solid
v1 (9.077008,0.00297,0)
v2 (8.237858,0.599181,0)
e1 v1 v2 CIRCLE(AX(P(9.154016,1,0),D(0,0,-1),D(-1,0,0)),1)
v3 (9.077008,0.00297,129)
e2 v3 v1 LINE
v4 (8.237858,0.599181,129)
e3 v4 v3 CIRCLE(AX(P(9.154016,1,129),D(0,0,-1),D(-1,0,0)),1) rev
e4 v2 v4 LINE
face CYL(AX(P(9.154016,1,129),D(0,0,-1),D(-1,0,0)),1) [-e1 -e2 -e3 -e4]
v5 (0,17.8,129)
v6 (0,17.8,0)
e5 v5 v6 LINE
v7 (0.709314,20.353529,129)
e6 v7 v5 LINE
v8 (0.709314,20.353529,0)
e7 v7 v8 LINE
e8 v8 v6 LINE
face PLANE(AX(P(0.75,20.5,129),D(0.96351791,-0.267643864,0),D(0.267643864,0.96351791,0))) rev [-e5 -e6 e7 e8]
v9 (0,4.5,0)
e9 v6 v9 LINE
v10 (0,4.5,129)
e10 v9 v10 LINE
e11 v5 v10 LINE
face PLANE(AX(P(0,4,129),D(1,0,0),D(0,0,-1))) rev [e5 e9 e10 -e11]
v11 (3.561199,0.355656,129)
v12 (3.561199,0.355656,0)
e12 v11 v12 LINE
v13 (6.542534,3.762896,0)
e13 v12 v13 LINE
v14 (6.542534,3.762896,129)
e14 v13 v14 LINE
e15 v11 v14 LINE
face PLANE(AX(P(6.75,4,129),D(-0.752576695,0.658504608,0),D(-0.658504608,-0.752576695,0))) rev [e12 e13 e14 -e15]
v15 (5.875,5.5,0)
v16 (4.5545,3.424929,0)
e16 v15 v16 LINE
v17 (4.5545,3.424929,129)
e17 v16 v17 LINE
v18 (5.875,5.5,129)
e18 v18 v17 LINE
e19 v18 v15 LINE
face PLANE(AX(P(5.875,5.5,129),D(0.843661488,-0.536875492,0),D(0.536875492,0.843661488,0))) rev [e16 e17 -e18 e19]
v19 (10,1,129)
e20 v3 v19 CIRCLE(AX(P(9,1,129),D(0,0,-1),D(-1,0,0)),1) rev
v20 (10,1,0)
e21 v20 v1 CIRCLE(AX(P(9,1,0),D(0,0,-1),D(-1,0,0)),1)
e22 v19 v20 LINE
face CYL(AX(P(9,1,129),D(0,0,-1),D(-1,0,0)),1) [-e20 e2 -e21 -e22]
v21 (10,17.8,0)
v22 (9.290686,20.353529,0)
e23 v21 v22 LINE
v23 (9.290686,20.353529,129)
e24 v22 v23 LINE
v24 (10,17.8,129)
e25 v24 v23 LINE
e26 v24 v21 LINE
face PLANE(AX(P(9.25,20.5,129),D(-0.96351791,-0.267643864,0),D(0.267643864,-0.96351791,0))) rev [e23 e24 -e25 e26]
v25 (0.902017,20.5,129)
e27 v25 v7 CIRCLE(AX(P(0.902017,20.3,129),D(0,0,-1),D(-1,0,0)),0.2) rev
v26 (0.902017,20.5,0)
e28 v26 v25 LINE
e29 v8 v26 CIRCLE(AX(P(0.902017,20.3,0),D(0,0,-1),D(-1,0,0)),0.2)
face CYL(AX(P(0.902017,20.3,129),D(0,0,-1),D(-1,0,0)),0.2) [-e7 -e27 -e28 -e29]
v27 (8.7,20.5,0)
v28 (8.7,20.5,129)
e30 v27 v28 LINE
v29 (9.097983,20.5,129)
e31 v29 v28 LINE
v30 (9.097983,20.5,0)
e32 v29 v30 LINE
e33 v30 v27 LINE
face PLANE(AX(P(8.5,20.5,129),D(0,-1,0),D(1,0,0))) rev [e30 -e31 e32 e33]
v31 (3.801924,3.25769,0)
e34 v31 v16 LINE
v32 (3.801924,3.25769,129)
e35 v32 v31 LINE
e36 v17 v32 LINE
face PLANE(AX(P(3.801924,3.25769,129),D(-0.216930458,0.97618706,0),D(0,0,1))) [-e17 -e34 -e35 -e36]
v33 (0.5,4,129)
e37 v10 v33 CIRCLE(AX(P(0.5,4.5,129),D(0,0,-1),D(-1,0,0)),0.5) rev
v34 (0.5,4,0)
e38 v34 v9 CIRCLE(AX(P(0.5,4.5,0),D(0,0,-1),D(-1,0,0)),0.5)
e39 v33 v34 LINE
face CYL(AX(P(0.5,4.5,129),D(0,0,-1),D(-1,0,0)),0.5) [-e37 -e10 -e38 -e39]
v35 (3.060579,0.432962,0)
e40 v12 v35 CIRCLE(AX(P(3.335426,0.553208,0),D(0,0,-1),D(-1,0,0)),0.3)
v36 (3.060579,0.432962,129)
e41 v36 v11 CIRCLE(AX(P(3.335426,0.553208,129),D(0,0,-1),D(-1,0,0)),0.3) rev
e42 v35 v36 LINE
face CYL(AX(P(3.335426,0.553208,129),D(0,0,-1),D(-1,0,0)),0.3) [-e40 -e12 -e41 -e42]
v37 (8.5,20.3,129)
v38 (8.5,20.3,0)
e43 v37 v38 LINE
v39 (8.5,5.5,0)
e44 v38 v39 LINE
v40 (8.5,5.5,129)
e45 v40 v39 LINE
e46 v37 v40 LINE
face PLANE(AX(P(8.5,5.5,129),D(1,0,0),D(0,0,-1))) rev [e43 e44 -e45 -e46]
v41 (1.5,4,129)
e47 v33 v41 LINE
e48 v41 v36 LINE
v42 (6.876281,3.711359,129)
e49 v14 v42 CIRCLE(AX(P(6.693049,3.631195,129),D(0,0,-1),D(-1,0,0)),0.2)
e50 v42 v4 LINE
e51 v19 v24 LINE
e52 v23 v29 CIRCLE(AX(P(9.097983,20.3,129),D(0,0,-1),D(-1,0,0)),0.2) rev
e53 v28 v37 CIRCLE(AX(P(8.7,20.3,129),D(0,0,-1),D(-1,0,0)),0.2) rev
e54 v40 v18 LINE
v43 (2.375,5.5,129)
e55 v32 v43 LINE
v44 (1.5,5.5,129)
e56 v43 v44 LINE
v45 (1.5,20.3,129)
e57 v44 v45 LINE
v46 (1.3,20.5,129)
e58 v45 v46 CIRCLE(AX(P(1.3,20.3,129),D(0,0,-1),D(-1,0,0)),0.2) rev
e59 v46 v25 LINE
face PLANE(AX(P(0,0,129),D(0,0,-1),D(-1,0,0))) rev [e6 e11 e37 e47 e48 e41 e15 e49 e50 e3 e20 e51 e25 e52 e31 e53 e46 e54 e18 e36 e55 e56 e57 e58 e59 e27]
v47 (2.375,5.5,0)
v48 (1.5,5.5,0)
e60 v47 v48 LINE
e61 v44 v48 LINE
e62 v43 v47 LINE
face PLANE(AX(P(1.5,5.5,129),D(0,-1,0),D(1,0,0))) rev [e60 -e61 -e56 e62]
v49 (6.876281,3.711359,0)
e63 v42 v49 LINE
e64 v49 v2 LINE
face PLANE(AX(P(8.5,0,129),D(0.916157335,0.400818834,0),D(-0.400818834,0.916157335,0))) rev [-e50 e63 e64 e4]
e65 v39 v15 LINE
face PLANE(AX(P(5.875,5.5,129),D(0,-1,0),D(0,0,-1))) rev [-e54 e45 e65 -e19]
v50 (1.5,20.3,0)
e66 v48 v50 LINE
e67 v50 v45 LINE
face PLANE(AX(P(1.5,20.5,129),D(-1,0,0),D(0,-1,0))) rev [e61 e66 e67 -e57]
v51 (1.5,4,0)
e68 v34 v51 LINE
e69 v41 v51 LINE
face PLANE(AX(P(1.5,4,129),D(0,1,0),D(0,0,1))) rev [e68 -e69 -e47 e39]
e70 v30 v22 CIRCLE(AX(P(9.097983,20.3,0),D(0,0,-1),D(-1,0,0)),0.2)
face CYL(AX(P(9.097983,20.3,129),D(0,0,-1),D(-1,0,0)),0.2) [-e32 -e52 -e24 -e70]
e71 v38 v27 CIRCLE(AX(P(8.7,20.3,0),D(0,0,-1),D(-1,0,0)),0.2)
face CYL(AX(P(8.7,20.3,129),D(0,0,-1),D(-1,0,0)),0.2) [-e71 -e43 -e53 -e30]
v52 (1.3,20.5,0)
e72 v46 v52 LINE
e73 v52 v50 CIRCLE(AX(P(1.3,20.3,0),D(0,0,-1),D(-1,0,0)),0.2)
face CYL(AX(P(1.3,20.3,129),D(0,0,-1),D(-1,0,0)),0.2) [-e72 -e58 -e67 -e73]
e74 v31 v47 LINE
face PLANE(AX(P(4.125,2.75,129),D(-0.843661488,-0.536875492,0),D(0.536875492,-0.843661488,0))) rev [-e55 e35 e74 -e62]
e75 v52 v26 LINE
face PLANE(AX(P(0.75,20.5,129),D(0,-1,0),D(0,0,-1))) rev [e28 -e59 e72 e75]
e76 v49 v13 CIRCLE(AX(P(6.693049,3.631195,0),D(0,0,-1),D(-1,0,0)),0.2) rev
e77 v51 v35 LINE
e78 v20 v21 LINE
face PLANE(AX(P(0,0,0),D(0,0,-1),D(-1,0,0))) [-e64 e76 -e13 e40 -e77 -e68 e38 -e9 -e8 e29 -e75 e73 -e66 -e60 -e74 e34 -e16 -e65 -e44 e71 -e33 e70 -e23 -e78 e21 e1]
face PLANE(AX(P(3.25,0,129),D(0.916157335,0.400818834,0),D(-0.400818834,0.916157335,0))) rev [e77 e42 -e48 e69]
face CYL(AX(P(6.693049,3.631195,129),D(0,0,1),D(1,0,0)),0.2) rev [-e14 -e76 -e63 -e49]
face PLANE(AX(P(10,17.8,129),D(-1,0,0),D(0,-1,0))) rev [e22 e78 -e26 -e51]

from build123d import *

# Parameters (mm, degrees)
BOSS_EXTRUDE1_DEPTH = 129
FILLET1_R           = 0.2
FILLET1_R_2         = 0.3
FILLET1_R_3         = 1
FILLET1_R_4         = 0.5
CHAMFER1_SIZE       = 0.8
CHAMFER1_SIZE2      = 0.601769912


with BuildPart() as part:
    # Sketch1 → Boss-Extrude1 (new body)
    with BuildSketch(Plane.XY):
        Polygon((1.5, 20.5), (1.5, 5.5), (2.375, 5.5), (4.125, 2.75), (5.875, 5.5), (8.5, 5.5), (8.5, 20.5), (9.25, 20.5), (10, 17.8), (10, 0), (8.5, 0), (6.75, 4), (3.25, 0), (1.5, 4), (0, 4), (0, 17.8), (0.75, 20.5), align=None)
    extrude(amount=BOSS_EXTRUDE1_DEPTH)

    # Fillet1
    # the kernel refuses this fillet: 1, 0.5, 0.3, 0.2 mm, written as the material it adds along each edge
    with BuildSketch(Plane(origin=(6.75, 4, 0), x_dir=(0.40081883401970875, -0.9161573349021888, 0), z_dir=(0, 0, 1))) as fillet1_piece_1:
        with BuildLine():
            CenterArc((FILLET1_R * 1.57528283018, -FILLET1_R), FILLET1_R, 90, 115.184697104)
            Line((FILLET1_R * 0.670342090327, -FILLET1_R * 1.42553760981), (0, 0))
            Line((0, 0), (FILLET1_R * 1.57528283018, 0))
        make_face()
    extrude(amount=129)
    # the kernel refuses this fillet: 1, 0.5, 0.3, 0.2 mm, written as the material it takes off along each edge
    with BuildSketch(Plane(origin=(3.25, 0, -1.181462123), x_dir=(0.6585046078685179, 0.752576694706878, 0), z_dir=(0, 0, 1))) as fillet1_2_piece_1:
        with BuildLine():
            CenterArc((FILLET1_R_2 * 1.57528283018, FILLET1_R_2), FILLET1_R_2, 154.815302896, 115.184697104)
            Line((FILLET1_R_2 * 0.670342090327, FILLET1_R_2 * 1.42553760981), (0, 0))
            Line((0, 0), (FILLET1_R_2 * 1.57528283018, 0))
        make_face()
    extrude(amount=131.362924245, mode=Mode.SUBTRACT)
    with BuildSketch(Plane(origin=(8.5, 0, -1.635038937), x_dir=(1, 0, 0), z_dir=(0, 0, 1))) as fillet1_2_piece_2:
        with BuildLine():
            CenterArc((FILLET1_R_3 * 0.654015574786, FILLET1_R_3), FILLET1_R_3, 203.629377731, 66.370622269)
            Line((-FILLET1_R_3 * 0.262141760116, FILLET1_R_3 * 0.59918116598), (0, 0))
            Line((0, 0), (FILLET1_R_3 * 0.654015574786, 0))
        make_face()
    extrude(amount=132.270077874, mode=Mode.SUBTRACT)
    with BuildSketch(Plane(origin=(10, 0, -2.5), x_dir=(0, 1, 0), z_dir=(0, 0, 1))) as fillet1_2_piece_3:
        with BuildLine():
            CenterArc((FILLET1_R_3, FILLET1_R_3), FILLET1_R_3, 180, 90)
            Line((0, FILLET1_R_3), (0, 0))
            Line((0, 0), (FILLET1_R_3, 0))
        make_face()
    extrude(amount=134, mode=Mode.SUBTRACT)
    with BuildSketch(Plane(origin=(0, 4, -1.25), x_dir=(1, 0, 0), z_dir=(0, 0, 1))) as fillet1_2_piece_4:
        with BuildLine():
            CenterArc((FILLET1_R_4, FILLET1_R_4), FILLET1_R_4, 180, 90)
            Line((0, FILLET1_R_4), (0, 0))
            Line((0, 0), (FILLET1_R_4, 0))
        make_face()
    extrude(amount=131.5, mode=Mode.SUBTRACT)
    with BuildSketch(Plane(origin=(9.25, 20.5, -0.380042825), x_dir=(-1, 0, 0), z_dir=(0, 0, 1))) as fillet1_2_piece_5:
        with BuildLine():
            CenterArc((FILLET1_R * 0.760085649571, FILLET1_R), FILLET1_R, 195.524110997, 74.475889003)
            Line((-FILLET1_R * 0.203432260059, FILLET1_R * 0.732356136214), (0, 0))
            Line((0, 0), (FILLET1_R * 0.760085649571, 0))
        make_face()
    extrude(amount=129.76008565, mode=Mode.SUBTRACT)
    with BuildSketch(Plane(origin=(8.5, 20.5, -0.5), x_dir=(0, -1, 0), z_dir=(0, 0, 1))) as fillet1_2_piece_6:
        with BuildLine():
            CenterArc((FILLET1_R, FILLET1_R), FILLET1_R, 180, 90)
            Line((0, FILLET1_R), (0, 0))
            Line((0, 0), (FILLET1_R, 0))
        make_face()
    extrude(amount=130, mode=Mode.SUBTRACT)
    with BuildSketch(Plane(origin=(1.5, 20.5, -0.5), x_dir=(0, -1, 0), z_dir=(0, 0, 1))) as fillet1_2_piece_7:
        with BuildLine():
            CenterArc((FILLET1_R, -FILLET1_R), FILLET1_R, 90, 90)
            Line((0, -FILLET1_R), (0, 0))
            Line((0, 0), (FILLET1_R, 0))
        make_face()
    extrude(amount=130, mode=Mode.SUBTRACT)
    with BuildSketch(Plane(origin=(0.75, 20.5, -0.380042825), x_dir=(1, 0, 0), z_dir=(0, 0, 1))) as fillet1_2_piece_8:
        with BuildLine():
            CenterArc((FILLET1_R * 0.760085649571, -FILLET1_R), FILLET1_R, 90, 74.475889003)
            Line((-FILLET1_R * 0.203432260059, -FILLET1_R * 0.732356136214), (0, 0))
            Line((0, 0), (FILLET1_R * 0.760085649571, 0))
        make_face()
    extrude(amount=129.76008565, mode=Mode.SUBTRACT)

    # Chamfer1
    chamfer1_edges = [part.edges().sort_by_distance(p)[0] for p in [
        (4.125, 2.75, 64.5),
    ]]
    chamfer1_side = [part.faces().sort_by_distance(p)[0] for p in [
        (5, 4.125, 64.5),
    ]]
    chamfer(chamfer1_edges, length=CHAMFER1_SIZE, length2=CHAMFER1_SIZE2, reference=chamfer1_side[0])


solid = part.part
